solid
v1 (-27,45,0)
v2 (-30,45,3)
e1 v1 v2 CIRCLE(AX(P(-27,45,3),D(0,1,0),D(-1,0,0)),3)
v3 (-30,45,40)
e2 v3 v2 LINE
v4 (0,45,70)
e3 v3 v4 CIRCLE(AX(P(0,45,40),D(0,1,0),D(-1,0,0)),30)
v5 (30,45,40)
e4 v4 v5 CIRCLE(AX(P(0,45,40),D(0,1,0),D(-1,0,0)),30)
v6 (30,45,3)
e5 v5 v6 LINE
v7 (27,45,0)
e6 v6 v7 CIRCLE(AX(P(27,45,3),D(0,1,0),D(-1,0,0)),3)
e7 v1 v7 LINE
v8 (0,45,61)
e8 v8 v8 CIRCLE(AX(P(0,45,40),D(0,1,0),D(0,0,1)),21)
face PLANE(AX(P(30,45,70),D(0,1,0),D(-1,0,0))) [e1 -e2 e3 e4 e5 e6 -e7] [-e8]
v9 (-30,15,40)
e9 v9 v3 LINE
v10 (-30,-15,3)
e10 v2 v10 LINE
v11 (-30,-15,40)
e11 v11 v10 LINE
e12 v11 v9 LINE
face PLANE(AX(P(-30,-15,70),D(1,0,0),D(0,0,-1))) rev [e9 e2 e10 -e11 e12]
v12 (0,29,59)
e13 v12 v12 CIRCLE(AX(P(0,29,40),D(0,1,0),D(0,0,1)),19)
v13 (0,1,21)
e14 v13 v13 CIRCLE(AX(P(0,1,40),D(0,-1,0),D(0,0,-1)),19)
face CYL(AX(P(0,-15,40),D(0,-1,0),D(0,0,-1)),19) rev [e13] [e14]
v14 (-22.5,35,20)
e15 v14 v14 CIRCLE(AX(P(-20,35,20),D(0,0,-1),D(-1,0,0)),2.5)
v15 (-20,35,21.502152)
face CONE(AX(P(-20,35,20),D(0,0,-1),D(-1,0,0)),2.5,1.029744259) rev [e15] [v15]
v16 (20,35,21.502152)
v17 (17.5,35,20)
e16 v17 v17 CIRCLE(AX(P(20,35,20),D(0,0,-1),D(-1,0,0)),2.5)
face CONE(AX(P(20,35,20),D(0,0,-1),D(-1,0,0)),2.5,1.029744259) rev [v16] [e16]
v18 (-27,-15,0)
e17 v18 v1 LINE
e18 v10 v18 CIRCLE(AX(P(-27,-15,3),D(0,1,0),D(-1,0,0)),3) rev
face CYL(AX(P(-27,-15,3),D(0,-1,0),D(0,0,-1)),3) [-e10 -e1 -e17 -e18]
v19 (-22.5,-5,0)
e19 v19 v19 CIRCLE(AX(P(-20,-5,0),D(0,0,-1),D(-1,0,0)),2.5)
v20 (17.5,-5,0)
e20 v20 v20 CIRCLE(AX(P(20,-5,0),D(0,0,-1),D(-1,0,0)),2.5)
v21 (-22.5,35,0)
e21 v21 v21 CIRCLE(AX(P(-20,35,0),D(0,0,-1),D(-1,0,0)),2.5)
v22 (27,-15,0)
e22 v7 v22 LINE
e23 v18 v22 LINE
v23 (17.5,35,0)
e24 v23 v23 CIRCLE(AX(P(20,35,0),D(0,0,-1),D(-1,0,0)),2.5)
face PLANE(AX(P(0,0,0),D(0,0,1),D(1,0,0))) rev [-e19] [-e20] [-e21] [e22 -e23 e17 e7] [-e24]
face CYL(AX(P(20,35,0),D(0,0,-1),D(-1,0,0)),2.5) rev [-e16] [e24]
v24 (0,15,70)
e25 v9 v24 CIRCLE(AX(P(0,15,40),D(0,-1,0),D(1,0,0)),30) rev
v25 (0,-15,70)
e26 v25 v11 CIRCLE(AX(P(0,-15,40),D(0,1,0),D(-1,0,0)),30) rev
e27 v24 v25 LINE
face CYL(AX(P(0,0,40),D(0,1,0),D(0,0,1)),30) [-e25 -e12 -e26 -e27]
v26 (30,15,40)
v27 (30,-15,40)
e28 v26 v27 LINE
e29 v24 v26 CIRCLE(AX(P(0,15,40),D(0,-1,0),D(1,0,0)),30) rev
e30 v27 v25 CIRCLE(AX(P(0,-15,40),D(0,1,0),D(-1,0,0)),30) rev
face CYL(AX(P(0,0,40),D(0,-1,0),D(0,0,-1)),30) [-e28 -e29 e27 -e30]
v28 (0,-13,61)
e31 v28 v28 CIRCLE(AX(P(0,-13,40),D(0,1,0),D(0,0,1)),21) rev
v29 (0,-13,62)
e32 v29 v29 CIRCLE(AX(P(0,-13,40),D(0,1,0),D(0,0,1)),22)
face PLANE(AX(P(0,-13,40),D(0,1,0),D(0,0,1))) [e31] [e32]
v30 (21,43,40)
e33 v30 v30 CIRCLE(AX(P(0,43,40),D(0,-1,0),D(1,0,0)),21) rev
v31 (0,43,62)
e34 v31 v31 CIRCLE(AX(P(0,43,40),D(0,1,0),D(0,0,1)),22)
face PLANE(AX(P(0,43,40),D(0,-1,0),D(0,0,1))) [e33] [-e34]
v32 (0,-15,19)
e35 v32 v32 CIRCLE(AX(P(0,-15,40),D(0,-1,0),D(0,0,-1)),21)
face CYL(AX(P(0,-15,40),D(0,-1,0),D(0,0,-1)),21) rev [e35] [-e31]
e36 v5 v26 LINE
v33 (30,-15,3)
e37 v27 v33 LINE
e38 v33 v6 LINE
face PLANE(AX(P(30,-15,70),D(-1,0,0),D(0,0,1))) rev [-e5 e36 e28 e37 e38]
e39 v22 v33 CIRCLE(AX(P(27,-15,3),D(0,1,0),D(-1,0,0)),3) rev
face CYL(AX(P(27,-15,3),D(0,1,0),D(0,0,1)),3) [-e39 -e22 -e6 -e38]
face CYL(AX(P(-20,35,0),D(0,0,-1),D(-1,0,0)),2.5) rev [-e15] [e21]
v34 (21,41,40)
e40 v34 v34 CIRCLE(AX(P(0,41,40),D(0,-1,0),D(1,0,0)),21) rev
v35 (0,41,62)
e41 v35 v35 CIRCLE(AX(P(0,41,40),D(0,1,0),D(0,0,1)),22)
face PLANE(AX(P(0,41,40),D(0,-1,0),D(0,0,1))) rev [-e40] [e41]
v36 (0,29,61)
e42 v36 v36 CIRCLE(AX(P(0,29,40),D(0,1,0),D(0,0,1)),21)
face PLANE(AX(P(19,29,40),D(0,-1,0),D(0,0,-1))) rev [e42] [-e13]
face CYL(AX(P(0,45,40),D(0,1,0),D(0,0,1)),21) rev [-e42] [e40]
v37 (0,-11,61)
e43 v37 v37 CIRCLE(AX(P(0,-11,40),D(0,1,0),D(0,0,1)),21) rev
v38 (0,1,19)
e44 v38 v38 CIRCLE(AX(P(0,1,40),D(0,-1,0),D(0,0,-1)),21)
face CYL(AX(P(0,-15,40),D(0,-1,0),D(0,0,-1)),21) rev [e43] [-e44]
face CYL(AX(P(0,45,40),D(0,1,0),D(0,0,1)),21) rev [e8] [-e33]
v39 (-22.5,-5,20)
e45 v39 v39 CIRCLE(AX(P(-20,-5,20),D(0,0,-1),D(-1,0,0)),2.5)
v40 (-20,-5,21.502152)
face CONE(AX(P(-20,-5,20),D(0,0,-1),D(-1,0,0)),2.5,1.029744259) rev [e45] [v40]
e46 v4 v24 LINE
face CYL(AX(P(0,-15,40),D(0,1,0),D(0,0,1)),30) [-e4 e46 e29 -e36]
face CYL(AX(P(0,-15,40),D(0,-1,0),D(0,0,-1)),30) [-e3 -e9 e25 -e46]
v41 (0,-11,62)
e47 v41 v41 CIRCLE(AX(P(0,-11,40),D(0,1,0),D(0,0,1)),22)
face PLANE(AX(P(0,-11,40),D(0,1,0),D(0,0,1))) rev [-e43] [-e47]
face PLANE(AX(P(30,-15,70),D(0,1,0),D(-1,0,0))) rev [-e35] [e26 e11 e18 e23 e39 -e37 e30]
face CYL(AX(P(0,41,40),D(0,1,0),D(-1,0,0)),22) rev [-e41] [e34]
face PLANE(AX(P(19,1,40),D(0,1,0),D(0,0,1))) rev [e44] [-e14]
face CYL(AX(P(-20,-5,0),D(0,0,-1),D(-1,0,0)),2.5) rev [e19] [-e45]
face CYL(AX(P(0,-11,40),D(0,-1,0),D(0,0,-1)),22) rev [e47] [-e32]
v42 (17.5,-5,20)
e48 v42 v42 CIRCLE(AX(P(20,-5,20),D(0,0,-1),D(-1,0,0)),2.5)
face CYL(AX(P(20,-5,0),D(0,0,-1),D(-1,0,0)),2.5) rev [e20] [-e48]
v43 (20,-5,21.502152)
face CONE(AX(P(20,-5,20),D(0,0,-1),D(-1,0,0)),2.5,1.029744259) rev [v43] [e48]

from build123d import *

# Parameters (mm, degrees)
SKIZZE1_W                                            = 60
SKIZZE1_H                                            = 30
AUFSATZ_LINEAR_AUSTRAGEN1_DEPTH                      = 70
VERRUNDUNG1_R                                        = 30
STIRNSENKUNG_F_R_M42_ZYLINDERSCHRAUBE_MI_D           = 38
STIRNSENKUNG_F_R_M42_ZYLINDERSCHRAUBE_MI_CBORE_D     = 42
STIRNSENKUNG_F_R_M42_ZYLINDERSCHRAUBE_MI_CBORE_DEPTH = 16
SKIZZE4_R                                            = 22
SCHNITT_LINEAR_AUSTRAGEN1_DEPTH                      = 1
VERRUNDUNG1_OF_SPIEGELN1_R                           = 30
M6_GEWINDEBOHRUNG1_D                                 = 5
M6_GEWINDEBOHRUNG1_DEPTH                             = 20
M6_GEWINDEBOHRUNG1_TIP                               = 1.502151548
VERRUNDUNG2_R                                        = 3


with BuildPart() as part:
    # Skizze1 → Aufsatz-Linear austragen1 (new body)
    with BuildSketch(Plane.XY):
        Rectangle(SKIZZE1_W, SKIZZE1_H)
    aufsatz_linear_austragen1 = extrude(amount=AUFSATZ_LINEAR_AUSTRAGEN1_DEPTH)

    # Verrundung1
    verrundung1_edges = [part.edges().sort_by_distance(p)[0] for p in [
        (30, 0, 70),
        (-30, 0, 70),
    ]]
    fillet(verrundung1_edges, radius=VERRUNDUNG1_R - 0.0001)  # a hair under: the kernel refuses the full size

    # Stirnsenkung für M42 Zylinderschraube mit Innensechskant1 (through all)
    with Locations(Plane(origin=(0, -15, 0), x_dir=(-1, 0, 0), z_dir=(0, -1, 0))):
        with Locations((0, -40)):
            stirnsenkung_f_r_m42_zylinderschraube_mi = CounterBoreHole(STIRNSENKUNG_F_R_M42_ZYLINDERSCHRAUBE_MI_D / 2, STIRNSENKUNG_F_R_M42_ZYLINDERSCHRAUBE_MI_CBORE_D / 2, STIRNSENKUNG_F_R_M42_ZYLINDERSCHRAUBE_MI_CBORE_DEPTH)

    # Skizze4 → Schnitt-Linear austragen1 (cut, symmetric)
    with BuildSketch(Plane(origin=(0, -12, 0), x_dir=(1, 0, 0), z_dir=(0, 1, 0))):
        with Locations(Location((0, -40, 0), (0, 0, 270))):
            Circle(SKIZZE4_R)
    schnitt_linear_austragen1 = extrude(amount=SCHNITT_LINEAR_AUSTRAGEN1_DEPTH, both=True, mode=Mode.SUBTRACT)

    # Spiegeln1: Aufsatz-Linear austragen1, Stirnsenkung für M42 Zylinderschraube mit Innensechskant1, Schnitt-Linear austragen1 across plane
    add(aufsatz_linear_austragen1.mirror(Plane(origin=(30, 15, 70), x_dir=(0, 0, 1), z_dir=(0, -1, 0))))
    add(stirnsenkung_f_r_m42_zylinderschraube_mi.mirror(Plane(origin=(30, 15, 70), x_dir=(0, 0, 1), z_dir=(0, -1, 0))), mode=Mode.SUBTRACT)
    add(schnitt_linear_austragen1.mirror(Plane(origin=(30, 15, 70), x_dir=(0, 0, 1), z_dir=(0, -1, 0))), mode=Mode.SUBTRACT)

    # Verrundung1 of Spiegeln1
    verrundung1_of_spiegeln1_edges = [part.edges().sort_by_distance(p)[0] for p in [
        (30, 30, 70),
        (-30, 30, 70),
    ]]
    fillet(verrundung1_of_spiegeln1_edges, radius=VERRUNDUNG1_OF_SPIEGELN1_R - 0.0001)  # a hair under: the kernel refuses the full size

    # M6 Gewindebohrung1
    with Locations(Plane(origin=(0, 0, 0), x_dir=(-1, 0, 0), z_dir=(0, 0, -1))):
        with Locations((-20, 35), (20, 35), (-20, -5), (20, -5)):
            Hole(M6_GEWINDEBOHRUNG1_D / 2, depth=M6_GEWINDEBOHRUNG1_DEPTH)
            with Locations((0, 0, -(M6_GEWINDEBOHRUNG1_DEPTH + M6_GEWINDEBOHRUNG1_TIP / 2))):  # 118° drill point
                Cone(0, M6_GEWINDEBOHRUNG1_D / 2, M6_GEWINDEBOHRUNG1_TIP, mode=Mode.SUBTRACT)

    # Verrundung2
    verrundung2_edges = [part.edges().sort_by_distance(p)[0] for p in [
        (30, 15, 0),
        (-30, 15, 0),
    ]]
    fillet(verrundung2_edges, radius=VERRUNDUNG2_R)


solid = part.part
